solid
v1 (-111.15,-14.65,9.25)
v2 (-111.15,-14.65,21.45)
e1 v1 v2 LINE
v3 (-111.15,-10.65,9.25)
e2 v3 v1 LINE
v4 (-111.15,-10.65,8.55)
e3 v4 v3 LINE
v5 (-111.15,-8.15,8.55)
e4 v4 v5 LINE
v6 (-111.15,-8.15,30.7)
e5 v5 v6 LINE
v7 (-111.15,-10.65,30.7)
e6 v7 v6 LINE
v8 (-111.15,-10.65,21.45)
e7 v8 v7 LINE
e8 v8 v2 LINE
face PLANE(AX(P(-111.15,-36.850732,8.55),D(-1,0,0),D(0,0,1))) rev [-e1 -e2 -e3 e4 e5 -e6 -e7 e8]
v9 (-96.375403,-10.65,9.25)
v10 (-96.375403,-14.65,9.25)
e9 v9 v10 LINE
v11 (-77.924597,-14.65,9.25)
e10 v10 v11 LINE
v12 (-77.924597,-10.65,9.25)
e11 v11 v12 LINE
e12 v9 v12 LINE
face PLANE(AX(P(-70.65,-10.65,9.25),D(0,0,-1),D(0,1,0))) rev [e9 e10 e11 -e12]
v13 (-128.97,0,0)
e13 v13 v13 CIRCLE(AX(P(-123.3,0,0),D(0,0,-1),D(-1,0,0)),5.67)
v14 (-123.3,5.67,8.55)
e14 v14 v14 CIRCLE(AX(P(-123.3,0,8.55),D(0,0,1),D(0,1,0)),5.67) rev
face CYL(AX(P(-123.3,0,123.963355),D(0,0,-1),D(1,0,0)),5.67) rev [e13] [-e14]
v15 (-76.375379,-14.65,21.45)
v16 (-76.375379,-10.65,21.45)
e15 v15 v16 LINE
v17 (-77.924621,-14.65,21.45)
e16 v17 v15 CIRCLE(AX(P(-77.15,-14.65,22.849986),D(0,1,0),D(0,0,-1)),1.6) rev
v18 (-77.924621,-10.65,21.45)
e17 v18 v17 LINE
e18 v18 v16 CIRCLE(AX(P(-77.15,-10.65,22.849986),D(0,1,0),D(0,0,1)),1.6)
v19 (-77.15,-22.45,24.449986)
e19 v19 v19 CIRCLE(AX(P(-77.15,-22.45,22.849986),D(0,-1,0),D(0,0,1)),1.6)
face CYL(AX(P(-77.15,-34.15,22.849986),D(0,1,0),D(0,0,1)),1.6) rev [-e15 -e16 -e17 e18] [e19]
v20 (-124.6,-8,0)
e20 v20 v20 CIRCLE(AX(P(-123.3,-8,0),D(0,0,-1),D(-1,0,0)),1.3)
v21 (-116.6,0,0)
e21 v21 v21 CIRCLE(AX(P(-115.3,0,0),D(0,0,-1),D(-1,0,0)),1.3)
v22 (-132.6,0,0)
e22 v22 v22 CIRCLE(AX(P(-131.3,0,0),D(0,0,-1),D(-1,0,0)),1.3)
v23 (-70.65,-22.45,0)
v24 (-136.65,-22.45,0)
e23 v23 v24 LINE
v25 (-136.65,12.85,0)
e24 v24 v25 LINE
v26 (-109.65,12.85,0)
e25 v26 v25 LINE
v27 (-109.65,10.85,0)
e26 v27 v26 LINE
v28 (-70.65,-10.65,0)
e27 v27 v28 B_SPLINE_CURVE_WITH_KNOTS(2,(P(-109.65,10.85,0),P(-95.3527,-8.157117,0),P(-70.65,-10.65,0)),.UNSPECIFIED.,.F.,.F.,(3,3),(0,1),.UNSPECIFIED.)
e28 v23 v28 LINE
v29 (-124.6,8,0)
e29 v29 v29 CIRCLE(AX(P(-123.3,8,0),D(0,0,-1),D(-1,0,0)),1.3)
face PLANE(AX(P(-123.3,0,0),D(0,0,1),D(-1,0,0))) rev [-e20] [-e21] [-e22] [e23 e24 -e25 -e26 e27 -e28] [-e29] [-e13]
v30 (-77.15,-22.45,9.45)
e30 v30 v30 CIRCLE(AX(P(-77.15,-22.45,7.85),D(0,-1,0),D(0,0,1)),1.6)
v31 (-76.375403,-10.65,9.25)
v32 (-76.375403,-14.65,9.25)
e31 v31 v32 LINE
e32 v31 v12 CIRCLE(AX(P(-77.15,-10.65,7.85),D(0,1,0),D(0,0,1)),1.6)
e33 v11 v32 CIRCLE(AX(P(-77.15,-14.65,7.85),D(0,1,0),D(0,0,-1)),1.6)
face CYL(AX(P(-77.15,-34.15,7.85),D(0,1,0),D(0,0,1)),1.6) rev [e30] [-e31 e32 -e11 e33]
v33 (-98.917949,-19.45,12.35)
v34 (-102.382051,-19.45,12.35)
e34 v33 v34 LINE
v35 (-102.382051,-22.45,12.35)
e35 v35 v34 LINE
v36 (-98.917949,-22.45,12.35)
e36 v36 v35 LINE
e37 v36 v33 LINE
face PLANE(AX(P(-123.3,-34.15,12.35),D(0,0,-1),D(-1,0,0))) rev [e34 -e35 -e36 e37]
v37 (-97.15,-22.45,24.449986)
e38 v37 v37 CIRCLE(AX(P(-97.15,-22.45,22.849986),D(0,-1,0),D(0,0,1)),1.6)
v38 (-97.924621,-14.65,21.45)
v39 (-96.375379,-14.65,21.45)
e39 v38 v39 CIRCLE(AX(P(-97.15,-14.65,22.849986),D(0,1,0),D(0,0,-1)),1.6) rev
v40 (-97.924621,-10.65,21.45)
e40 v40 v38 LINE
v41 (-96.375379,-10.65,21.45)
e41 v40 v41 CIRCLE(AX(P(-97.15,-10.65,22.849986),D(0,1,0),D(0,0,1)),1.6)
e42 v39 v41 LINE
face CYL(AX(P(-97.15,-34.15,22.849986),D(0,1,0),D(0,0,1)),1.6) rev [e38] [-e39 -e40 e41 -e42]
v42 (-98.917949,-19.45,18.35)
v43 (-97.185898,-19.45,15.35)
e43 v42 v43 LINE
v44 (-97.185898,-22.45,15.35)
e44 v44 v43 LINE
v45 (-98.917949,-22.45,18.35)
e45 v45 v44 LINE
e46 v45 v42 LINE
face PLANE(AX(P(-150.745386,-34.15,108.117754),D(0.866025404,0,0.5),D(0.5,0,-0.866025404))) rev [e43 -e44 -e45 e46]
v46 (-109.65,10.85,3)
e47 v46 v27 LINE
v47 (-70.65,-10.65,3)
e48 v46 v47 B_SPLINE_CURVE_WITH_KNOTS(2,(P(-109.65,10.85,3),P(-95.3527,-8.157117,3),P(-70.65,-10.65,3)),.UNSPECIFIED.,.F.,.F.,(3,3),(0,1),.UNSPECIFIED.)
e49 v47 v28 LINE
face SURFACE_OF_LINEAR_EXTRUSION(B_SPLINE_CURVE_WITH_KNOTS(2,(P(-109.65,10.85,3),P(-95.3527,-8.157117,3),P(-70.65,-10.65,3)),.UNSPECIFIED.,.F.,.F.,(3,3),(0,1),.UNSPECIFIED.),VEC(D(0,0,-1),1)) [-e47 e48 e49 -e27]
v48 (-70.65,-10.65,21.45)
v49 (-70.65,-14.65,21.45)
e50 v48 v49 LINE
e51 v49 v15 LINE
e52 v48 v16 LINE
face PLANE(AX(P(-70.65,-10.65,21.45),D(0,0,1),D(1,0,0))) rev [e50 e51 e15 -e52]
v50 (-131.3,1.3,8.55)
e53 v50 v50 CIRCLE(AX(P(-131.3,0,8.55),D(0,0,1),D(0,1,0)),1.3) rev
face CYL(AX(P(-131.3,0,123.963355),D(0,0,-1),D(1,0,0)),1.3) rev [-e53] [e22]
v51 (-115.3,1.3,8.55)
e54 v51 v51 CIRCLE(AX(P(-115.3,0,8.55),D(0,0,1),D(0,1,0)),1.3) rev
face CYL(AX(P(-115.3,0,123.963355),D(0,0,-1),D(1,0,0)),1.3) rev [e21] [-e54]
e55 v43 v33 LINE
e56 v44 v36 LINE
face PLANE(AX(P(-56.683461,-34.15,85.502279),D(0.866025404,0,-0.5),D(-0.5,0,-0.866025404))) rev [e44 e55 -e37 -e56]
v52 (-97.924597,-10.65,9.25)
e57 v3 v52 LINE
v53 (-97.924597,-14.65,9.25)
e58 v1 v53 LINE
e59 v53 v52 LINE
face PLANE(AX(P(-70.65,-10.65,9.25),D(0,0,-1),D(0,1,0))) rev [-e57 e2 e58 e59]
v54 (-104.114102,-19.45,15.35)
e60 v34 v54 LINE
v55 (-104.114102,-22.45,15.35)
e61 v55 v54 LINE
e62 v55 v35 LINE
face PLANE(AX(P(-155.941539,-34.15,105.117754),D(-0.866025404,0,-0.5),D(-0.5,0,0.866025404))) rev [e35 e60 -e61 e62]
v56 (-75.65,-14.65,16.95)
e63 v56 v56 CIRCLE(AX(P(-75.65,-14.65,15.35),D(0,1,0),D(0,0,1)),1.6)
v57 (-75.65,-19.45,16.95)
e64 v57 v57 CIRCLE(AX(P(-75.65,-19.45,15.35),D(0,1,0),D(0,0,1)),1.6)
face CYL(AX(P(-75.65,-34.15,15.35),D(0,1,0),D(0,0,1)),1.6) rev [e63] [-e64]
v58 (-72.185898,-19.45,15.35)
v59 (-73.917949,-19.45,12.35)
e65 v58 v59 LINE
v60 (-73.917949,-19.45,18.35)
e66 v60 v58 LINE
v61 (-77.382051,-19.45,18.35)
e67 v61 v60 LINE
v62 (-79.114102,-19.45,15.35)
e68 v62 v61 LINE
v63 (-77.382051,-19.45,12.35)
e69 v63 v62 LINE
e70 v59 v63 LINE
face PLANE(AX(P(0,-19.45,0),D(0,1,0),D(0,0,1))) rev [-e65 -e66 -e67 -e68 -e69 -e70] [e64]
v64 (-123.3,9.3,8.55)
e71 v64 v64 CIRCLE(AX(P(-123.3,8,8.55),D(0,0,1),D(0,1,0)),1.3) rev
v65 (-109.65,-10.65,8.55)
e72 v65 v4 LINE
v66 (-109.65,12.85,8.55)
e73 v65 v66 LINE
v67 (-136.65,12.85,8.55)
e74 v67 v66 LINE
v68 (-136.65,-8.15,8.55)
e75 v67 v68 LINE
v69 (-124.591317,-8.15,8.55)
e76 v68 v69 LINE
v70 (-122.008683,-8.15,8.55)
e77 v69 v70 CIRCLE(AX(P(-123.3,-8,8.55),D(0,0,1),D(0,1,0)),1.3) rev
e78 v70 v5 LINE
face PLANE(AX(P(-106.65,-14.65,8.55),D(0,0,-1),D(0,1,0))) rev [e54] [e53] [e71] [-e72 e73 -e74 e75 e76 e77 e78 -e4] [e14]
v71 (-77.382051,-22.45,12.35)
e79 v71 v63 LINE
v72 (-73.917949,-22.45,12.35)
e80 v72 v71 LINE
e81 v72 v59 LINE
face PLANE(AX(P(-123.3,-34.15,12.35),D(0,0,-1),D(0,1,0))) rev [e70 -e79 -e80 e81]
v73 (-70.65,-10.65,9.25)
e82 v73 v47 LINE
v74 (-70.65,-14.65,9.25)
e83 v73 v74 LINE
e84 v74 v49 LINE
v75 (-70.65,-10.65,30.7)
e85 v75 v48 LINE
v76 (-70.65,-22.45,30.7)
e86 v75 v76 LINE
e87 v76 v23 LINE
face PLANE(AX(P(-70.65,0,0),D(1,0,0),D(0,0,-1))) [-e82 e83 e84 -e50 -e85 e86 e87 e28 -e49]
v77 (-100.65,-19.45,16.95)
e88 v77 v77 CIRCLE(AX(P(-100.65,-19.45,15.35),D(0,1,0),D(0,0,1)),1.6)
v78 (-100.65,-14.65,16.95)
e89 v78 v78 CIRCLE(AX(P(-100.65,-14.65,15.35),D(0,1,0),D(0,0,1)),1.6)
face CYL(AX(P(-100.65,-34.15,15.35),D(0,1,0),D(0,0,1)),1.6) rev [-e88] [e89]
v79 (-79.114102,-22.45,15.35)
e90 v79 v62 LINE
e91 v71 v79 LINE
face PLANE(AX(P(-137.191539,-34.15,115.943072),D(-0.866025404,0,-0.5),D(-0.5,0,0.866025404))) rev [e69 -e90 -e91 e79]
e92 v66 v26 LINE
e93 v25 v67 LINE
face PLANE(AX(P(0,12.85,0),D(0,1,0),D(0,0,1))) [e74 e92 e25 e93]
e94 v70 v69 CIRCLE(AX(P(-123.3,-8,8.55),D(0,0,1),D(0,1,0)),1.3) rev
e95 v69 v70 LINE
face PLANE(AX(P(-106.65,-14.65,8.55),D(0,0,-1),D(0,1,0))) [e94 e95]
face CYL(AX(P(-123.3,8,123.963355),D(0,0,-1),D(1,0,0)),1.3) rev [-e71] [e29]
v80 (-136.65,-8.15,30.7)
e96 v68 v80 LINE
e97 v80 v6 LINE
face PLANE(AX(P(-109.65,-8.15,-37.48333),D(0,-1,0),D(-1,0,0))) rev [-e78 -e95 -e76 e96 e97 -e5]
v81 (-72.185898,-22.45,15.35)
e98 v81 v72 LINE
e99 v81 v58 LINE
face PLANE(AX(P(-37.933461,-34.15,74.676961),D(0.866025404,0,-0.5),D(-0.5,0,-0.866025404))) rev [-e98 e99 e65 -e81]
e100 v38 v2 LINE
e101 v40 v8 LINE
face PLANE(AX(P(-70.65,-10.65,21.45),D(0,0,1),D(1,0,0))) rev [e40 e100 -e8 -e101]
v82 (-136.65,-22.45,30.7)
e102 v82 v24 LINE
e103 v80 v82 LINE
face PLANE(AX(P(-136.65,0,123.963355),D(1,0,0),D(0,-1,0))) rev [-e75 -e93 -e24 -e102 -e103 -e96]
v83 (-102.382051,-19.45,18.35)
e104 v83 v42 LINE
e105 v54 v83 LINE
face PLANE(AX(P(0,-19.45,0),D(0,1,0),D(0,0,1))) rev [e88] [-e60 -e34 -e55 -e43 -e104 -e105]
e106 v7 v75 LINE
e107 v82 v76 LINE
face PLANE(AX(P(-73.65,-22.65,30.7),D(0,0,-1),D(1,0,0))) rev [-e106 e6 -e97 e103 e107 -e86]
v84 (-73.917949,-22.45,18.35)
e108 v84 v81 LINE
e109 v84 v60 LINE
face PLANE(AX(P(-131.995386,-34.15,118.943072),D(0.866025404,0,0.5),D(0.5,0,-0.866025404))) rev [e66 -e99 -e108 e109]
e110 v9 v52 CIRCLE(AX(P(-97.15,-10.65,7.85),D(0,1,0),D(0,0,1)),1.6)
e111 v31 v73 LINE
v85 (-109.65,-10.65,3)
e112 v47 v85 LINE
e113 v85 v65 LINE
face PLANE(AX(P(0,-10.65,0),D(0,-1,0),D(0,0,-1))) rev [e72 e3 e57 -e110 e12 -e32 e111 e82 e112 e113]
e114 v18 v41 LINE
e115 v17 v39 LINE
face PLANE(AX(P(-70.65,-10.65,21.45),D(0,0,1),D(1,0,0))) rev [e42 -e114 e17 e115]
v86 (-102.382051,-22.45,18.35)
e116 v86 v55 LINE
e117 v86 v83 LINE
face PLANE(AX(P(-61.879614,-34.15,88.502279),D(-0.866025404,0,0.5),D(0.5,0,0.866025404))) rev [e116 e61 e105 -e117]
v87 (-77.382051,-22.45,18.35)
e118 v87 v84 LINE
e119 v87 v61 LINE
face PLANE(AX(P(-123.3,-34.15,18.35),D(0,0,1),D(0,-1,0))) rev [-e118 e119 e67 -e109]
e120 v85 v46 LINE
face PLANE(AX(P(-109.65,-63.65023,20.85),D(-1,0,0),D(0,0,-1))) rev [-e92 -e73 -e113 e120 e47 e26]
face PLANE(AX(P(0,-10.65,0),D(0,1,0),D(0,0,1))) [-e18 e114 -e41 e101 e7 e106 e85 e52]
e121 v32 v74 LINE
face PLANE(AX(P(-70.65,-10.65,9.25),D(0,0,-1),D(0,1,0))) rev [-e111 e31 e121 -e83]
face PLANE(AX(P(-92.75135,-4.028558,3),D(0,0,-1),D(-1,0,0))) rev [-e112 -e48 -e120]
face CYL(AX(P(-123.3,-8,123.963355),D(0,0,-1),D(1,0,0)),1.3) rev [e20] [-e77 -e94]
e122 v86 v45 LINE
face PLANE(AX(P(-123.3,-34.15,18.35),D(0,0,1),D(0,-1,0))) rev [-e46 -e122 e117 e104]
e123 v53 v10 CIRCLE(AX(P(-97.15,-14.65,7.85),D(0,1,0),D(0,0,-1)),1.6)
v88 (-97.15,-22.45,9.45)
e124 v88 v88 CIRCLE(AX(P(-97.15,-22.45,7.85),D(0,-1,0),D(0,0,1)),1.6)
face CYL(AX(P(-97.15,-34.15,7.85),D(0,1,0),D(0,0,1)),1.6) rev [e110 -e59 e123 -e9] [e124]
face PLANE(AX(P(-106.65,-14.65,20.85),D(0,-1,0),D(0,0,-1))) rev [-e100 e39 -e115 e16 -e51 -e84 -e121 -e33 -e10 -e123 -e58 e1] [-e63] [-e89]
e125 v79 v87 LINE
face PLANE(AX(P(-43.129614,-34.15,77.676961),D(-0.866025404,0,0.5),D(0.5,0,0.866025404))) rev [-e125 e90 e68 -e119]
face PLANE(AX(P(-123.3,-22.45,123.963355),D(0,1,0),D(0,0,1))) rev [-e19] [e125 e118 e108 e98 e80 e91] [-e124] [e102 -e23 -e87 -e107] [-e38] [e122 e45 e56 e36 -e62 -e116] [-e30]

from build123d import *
from build123d.topology import SkipClean

# Parameters (mm, degrees)
CROQUIS2_R                         = 10.875
CROQUIS2_R_2                       = 5.67
CROQUIS2_R_3                       = 1.6
CROQUIS2_R_4                       = 1.3
SALIENTE_EXTRUIR1_DEPTH            = 30.7
CROQUIS4_W                         = 27
CROQUIS4_H                         = 26
CORTAR_EXTRUIR2_DEPTH              = 22.7
CROQUIS3_W                         = 12.3
CROQUIS3_H                         = 8
CORTAR_EXTRUIR5_DEPTH              = 45
CORTAR_EXTRUIR7_START              = -24.5
CROQUIS7_W                         = 48
CROQUIS7_H                         = 9.85
CORTAR_EXTRUIR7_DEPTH              = 24.5
CORTAR_EXTRUIR10_DEPTH             = 77.154202117
CORTAR_EXTRUIR10_DEPTH_BACK        = 77.154202117
CROQUIS11_R                        = 1.6
CROQUIS18_W                        = 48
CROQUIS18_H                        = 9.85
CORTAR_EXTRUIR12_DEPTH             = 8
CROQUIS19_W                        = 12.3
CROQUIS19_H                        = 8
CORTAR_EXTRUIR13_DEPTH             = 3
CROQUIS20_R                        = 1.3
CROQUIS20_R_2                      = 5.67
SALIENTE_EXTRUIR2_DEPTH            = 0.55
SALIENTE_EXTRUIR4_START            = -22.15
SALIENTE_EXTRUIR4_DEPTH            = 22.15
S_LIDO_MOVER_COPIAR1_START         = 8.55
S_LIDO_MOVER_COPIAR1_DEPTH         = 22.15
S_LIDO_MOVER_COPIAR1_2_DEPTH       = 22.15
S_LIDO_MOVER_COPIAR1_3_DEPTH       = 30.7
S_LIDO_MOVER_COPIAR1_4_OUTLINE_R   = 1.3
S_LIDO_MOVER_COPIAR1_4_OUTLINE_R_2 = 5.67
S_LIDO_MOVER_COPIAR1_4_DEPTH       = 8.55
S_LIDO_MOVER_COPIAR1_START_2       = -34.15
S_LIDO_MOVER_COPIAR1_5_OUTLINE_R   = 1.6
S_LIDO_MOVER_COPIAR1_5_OUTLINE_W   = 75
S_LIDO_MOVER_COPIAR1_5_OUTLINE_H   = 30.7
S_LIDO_MOVER_COPIAR1_5_DEPTH       = 52
CROQUIS23_R                        = 1.6
CORTAR_EXTRUIR17_DEPTH             = 144.777475635
CORTAR_EXTRUIR18_DEPTH             = 3
CORTAR_EXTRUIR18_DEPTH_BACK        = 144.777475635
CORTAR_EXTRUIR18_START             = -7.8
CROQUIS24_W                        = 75
CROQUIS24_H                        = 30.7
CORTAR_EXTRUIR19_DEPTH             = 11.7
CROQUIS28_W                        = 27
CROQUIS28_H                        = 8.55
CORTAR_EXTRUIR21_DEPTH             = 5
CORTAR_EXTRUIR22_START             = -8
CORTAR_EXTRUIR22_DEPTH             = 8
CROQUIS30_W                        = 1.5
CROQUIS30_H                        = 22.15
CORTAR_EXTRUIR23_DEPTH             = 6.5
CROQUIS31_W                        = 30.7
CROQUIS31_H                        = 7.8
CORTAR_EXTRUIR24_DEPTH             = 9
CROQUIS32_W                        = 40.5
CROQUIS32_H                        = 9.25
CROQUIS32_W_2                      = 39
SALIENTE_EXTRUIR5_DEPTH            = 4
CROQUIS33_W                        = 1.5
CROQUIS33_H                        = 0.7
SALIENTE_EXTRUIR6_DEPTH            = 4
CROQUIS34_R                        = 1.6
CORTAR_EXTRUIR25_DEPTH             = 143.013951779
SALIENTE_EXTRUIR7_DEPTH            = 3


with BuildPart() as part:
    # Croquis2 → Saliente-Extruir1 (new body)
    # profile 1 of 6: a face of its own
    with BuildSketch(Plane.XY):
        Polygon((-61.65, 17.85), (-61.65, -34.15), (-50.65, -34.15), (-50.65, -32.65), (-50.65, -22.65), (-50.65, -22.45), (-49.65, -22.45), (-22.65, -22.45), (-21.65, -22.45), (-21.65, -22.65), (-21.65, -32.65), (-21.65, -34.15), (13.35, -34.15), (13.35, 17.85), align=None)
        Circle(CROQUIS2_R, mode=Mode.SUBTRACT)
    # profile 2 of 6: a face of its own
    with BuildSketch(Plane.XY):
        Circle(CROQUIS2_R)
        with Locations(Location((0, 0, 0), (0, 0, 90))):
            Circle(CROQUIS2_R_2, mode=Mode.SUBTRACT)
        with Locations((0, -8)):
            Circle(CROQUIS2_R_3, mode=Mode.SUBTRACT)
        with Locations((-8, 0)):
            Circle(CROQUIS2_R_3, mode=Mode.SUBTRACT)
        with Locations((8, 0)):
            Circle(CROQUIS2_R_3, mode=Mode.SUBTRACT)
        with Locations((0, 8)):
            Circle(CROQUIS2_R_3, mode=Mode.SUBTRACT)
    # profile 3 of 6: a face of its own
    with BuildSketch(Plane.XY):
        with Locations((0, 8)):
            Circle(CROQUIS2_R_3)
        with Locations(Location((0, 8, 0), (0, 0, 90))):
            Circle(CROQUIS2_R_4, mode=Mode.SUBTRACT)
    # profile 4 of 6: a face of its own
    with BuildSketch(Plane.XY):
        with Locations((8, 0)):
            Circle(CROQUIS2_R_3)
        with Locations(Location((8, 0, 0), (0, 0, 90))):
            Circle(CROQUIS2_R_4, mode=Mode.SUBTRACT)
    # profile 5 of 6: a face of its own
    with BuildSketch(Plane.XY):
        with Locations((0, -8)):
            Circle(CROQUIS2_R_3)
        with Locations(Location((0, -8, 0), (0, 0, 90))):
            Circle(CROQUIS2_R_4, mode=Mode.SUBTRACT)
    # profile 6 of 6: a face of its own
    with BuildSketch(Plane.XY):
        with Locations((-8, 0)):
            Circle(CROQUIS2_R_3)
        with Locations(Location((-8, 0, 0), (0, 0, 90))):
            Circle(CROQUIS2_R_4, mode=Mode.SUBTRACT)
    extrude(amount=SALIENTE_EXTRUIR1_DEPTH)

    # Croquis4 → Cortar-Extruir2 (cut)
    with BuildSketch(Plane.XY.offset(30.7)):
        with Locations((-0.15, 4.85)):
            Rectangle(CROQUIS4_W, CROQUIS4_H)
    extrude(amount=-CORTAR_EXTRUIR2_DEPTH, mode=Mode.SUBTRACT)

    # Croquis3 → Cortar-Extruir5 (cut)
    with BuildSketch(Plane.ZY.offset(61.65)):
        with Locations((14.7, -10.65)):
            Rectangle(CROQUIS3_W, CROQUIS3_H)
    extrude(amount=-CORTAR_EXTRUIR5_DEPTH, mode=Mode.SUBTRACT)

    # Croquis7 → Cortar-Extruir7 (cut)
    with BuildSketch(Plane(origin=(0, 17.85, 0), x_dir=(1, 0, 0), z_dir=(0, 1, 0)).offset(CORTAR_EXTRUIR7_START)):
        with Locations((-37.65, -25.775)):
            Rectangle(CROQUIS7_W, CROQUIS7_H)
        Polygon((-61.65, -8.55), (-61.65, -20.85), (-13.65, -20.85), (-13.65, 0), (-61.65, 0), align=None)
    extrude(amount=CORTAR_EXTRUIR7_DEPTH, mode=Mode.SUBTRACT)

    # Croquis11 → Cortar-Extruir10 (cut, two sides: drawn at the far end of the back side and taken through both)
    with BuildSketch(Plane(origin=(0, -14.65, 0), x_dir=(1, 0, 0), z_dir=(0, 1, 0)).offset(-CORTAR_EXTRUIR10_DEPTH_BACK)):
        with BuildLine():
            Line((-44.711250543, -8.55), (-47.588749457, -8.55))
            ThreePointArc((-47.588749457, -8.55), (-46.15, -9.45), (-44.711250543, -8.55))
        make_face()
        with BuildLine():
            ThreePointArc((-44.55, -7.85), (-46.509166305, -6.290833695), (-47.588749457, -8.55))
            Line((-47.588749457, -8.55), (-44.711250543, -8.55))
            ThreePointArc((-44.711250543, -8.55), (-44.590833695, -8.209166305), (-44.55, -7.85))
        make_face()
        with BuildLine():
            Line((-24.711250543, -8.55), (-27.588749457, -8.55))
            ThreePointArc((-27.588749457, -8.55), (-26.15, -9.45), (-24.711250543, -8.55))
        make_face()
        with BuildLine():
            ThreePointArc((-24.55, -7.85), (-26.509166305, -6.290833695), (-27.588749457, -8.55))
            Line((-27.588749457, -8.55), (-24.711250543, -8.55))
            ThreePointArc((-24.711250543, -8.55), (-24.590833695, -8.209166305), (-24.55, -7.85))
        make_face()
        with Locations(Location((-26.15, -22.849986467, 0), (0, 0, 270))):
            Circle(CROQUIS11_R)
        with Locations(Location((-46.15, -22.849986467, 0), (0, 0, 270))):
            Circle(CROQUIS11_R)
    extrude(amount=CORTAR_EXTRUIR10_DEPTH + CORTAR_EXTRUIR10_DEPTH_BACK, mode=Mode.SUBTRACT)

    # Croquis18 → Cortar-Extruir12 (cut)
    with BuildSketch(Plane(origin=(0, -6.65, 0), x_dir=(1, 0, 0), z_dir=(0, 1, 0))):
        with Locations((-37.65, -25.775)):
            Rectangle(CROQUIS18_W, CROQUIS18_H)
    extrude(amount=-CORTAR_EXTRUIR12_DEPTH, mode=Mode.SUBTRACT)

    # Croquis19 → Cortar-Extruir13 (cut)
    with BuildSketch(Plane.ZY.offset(16.65)):
        with Locations((14.7, -10.65)):
            Rectangle(CROQUIS19_W, CROQUIS19_H)
    extrude(amount=-CORTAR_EXTRUIR13_DEPTH, mode=Mode.SUBTRACT)

    # Croquis20 → Saliente-Extruir2 (add)
    with SkipClean():  # the faces are left unmerged after this step: merging them gives an invalid solid
        with BuildSketch(Plane.XY.offset(8)):
            with BuildLine():
                ThreePointArc((-1.291317157, -8.15), (0, -6.7), (1.291317157, -8.15))
                Line((1.291317157, -8.15), (13.35, -8.15))
                Line((13.35, -8.15), (13.35, 17.85))
                Line((13.35, 17.85), (-13.65, 17.85))
                Line((-13.65, 17.85), (-13.65, -6.65))
                Line((-13.65, -6.65), (-13.65, -8.15))
                Line((-13.65, -8.15), (-1.291317157, -8.15))
            make_face()
            with Locations(Location((8, 0, 0), (0, 0, 90))):
                Circle(CROQUIS20_R, mode=Mode.SUBTRACT)
            with Locations(Location((0, 0, 0), (0, 0, 90))):
                Circle(CROQUIS20_R_2, mode=Mode.SUBTRACT)
            with Locations(Location((0, 8, 0), (0, 0, 90))):
                Circle(CROQUIS20_R, mode=Mode.SUBTRACT)
            with Locations(Location((-8, 0, 0), (0, 0, 90))):
                Circle(CROQUIS20_R, mode=Mode.SUBTRACT)
        extrude(amount=SALIENTE_EXTRUIR2_DEPTH)

    # Croquis22 → Saliente-Extruir4 (add)
    with BuildSketch(Plane.XY.offset(30.7).offset(SALIENTE_EXTRUIR4_START)):
        with BuildLine():
            Line((-1.291317157, -8.15), (1.291317157, -8.15))
            ThreePointArc((1.291317157, -8.15), (0, -9.3), (-1.291317157, -8.15))
        make_face()
    extrude(amount=SALIENTE_EXTRUIR4_DEPTH)

    # Sólido-Mover/Copiar1: read off the stored shape, not the designer's step
    # Sólido-Mover/Copiar1 outline → Sólido-Mover/Copiar1 (cut)
    with BuildSketch(Plane.XY.offset(S_LIDO_MOVER_COPIAR1_START)):
        with BuildLine():
            Line((1.291317157, -8.15), (-1.291317157, -8.15))
            ThreePointArc((-1.291317157, -8.15), (0, -9.3), (1.291317157, -8.15))
        make_face()
    extrude(amount=S_LIDO_MOVER_COPIAR1_DEPTH, mode=Mode.SUBTRACT)



with BuildPart() as body_2:
    # S_lido-Mover_Copiar1 2 outline → S_lido-Mover_Copiar1 2 (new body)
    with BuildSketch(Plane.XY.offset(S_LIDO_MOVER_COPIAR1_START)):
        with BuildLine():
            Line((-122.008682843, -8.15), (-124.591317157, -8.15))
            ThreePointArc((-124.591317157, -8.15), (-123.3, -9.3), (-122.008682843, -8.15))
        make_face()
    extrude(amount=S_LIDO_MOVER_COPIAR1_2_DEPTH)


with BuildPart() as part_1:
    add(part.part)

    add(body_2.part)  # S_lido-Mover_Copiar1 3 merges body 2
    # S_lido-Mover_Copiar1 3 outline → S_lido-Mover_Copiar1 3 (add)
    with BuildSketch(Plane.XY):
        with BuildLine():
            Line((-124.591317157, -8.15), (-136.65, -8.15))
            Line((-136.65, -8.15), (-136.65, -34.15))
            Line((-136.65, -34.15), (-101.65, -34.15))
            Line((-101.65, -34.15), (-101.65, -22.45))
            Line((-101.65, -22.45), (-72.65, -22.45))
            Line((-72.65, -22.45), (-72.65, -34.15))
            Line((-72.65, -34.15), (-50.65, -34.15))
            Line((-50.65, -34.15), (-50.65, -22.45))
            Line((-50.65, -22.45), (-21.65, -22.45))
            Line((-21.65, -22.45), (-21.65, -34.15))
            Line((-21.65, -34.15), (13.35, -34.15))
            Line((13.35, -34.15), (13.35, -8.15))
            Line((13.35, -8.15), (1.291317157, -8.15))
            ThreePointArc((1.291317157, -8.15), (0, -9.3), (-1.291317157, -8.15))
            Line((-1.291317157, -8.15), (-13.65, -8.15))
            Line((-13.65, -8.15), (-13.65, -14.65))
            Line((-13.65, -14.65), (-109.65, -14.65))
            Line((-109.65, -14.65), (-109.65, -8.15))
            Line((-109.65, -8.15), (-122.008682843, -8.15))
            ThreePointArc((-122.008682843, -8.15), (-123.3, -9.3), (-124.591317157, -8.15))
        make_face()
    extrude(amount=S_LIDO_MOVER_COPIAR1_3_DEPTH)

    # S_lido-Mover_Copiar1 4 outline → S_lido-Mover_Copiar1 4 (add)
    with BuildSketch(Plane.XY):
        with BuildLine():
            Line((-136.65, 17.85), (-136.65, -8.15))
            Line((-136.65, -8.15), (-124.591317157, -8.15))
            ThreePointArc((-124.591317157, -8.15), (-123.3, -6.7), (-122.008682843, -8.15))
            Line((-122.008682843, -8.15), (-109.65, -8.15))
            Line((-109.65, -8.15), (-109.65, -14.65))
            Line((-109.65, -14.65), (-13.65, -14.65))
            Line((-13.65, -14.65), (-13.65, -8.15))
            Line((-13.65, -8.15), (-1.291317157, -8.15))
            ThreePointArc((-1.291317157, -8.15), (0, -6.7), (1.291317157, -8.15))
            Line((1.291317157, -8.15), (13.35, -8.15))
            Line((13.35, -8.15), (13.35, 17.85))
            Line((13.35, 17.85), (-13.65, 17.85))
            Line((-13.65, 17.85), (-13.65, -6.65))
            Line((-13.65, -6.65), (-109.65, -6.65))
            Line((-109.65, -6.65), (-109.65, 17.85))
            Line((-109.65, 17.85), (-136.65, 17.85))
        make_face()
        with Locations((-131.3, 0)):
            Circle(S_LIDO_MOVER_COPIAR1_4_OUTLINE_R, mode=Mode.SUBTRACT)
        with Locations((-123.3, 0)):
            Circle(S_LIDO_MOVER_COPIAR1_4_OUTLINE_R_2, mode=Mode.SUBTRACT)
        with Locations((-115.3, 0)):
            Circle(S_LIDO_MOVER_COPIAR1_4_OUTLINE_R, mode=Mode.SUBTRACT)
        with Locations((-123.3, 8)):
            Circle(S_LIDO_MOVER_COPIAR1_4_OUTLINE_R, mode=Mode.SUBTRACT)
        with Locations((-8, 0)):
            Circle(S_LIDO_MOVER_COPIAR1_4_OUTLINE_R, mode=Mode.SUBTRACT)
        Circle(S_LIDO_MOVER_COPIAR1_4_OUTLINE_R_2, mode=Mode.SUBTRACT)
        with Locations((8, 0)):
            Circle(S_LIDO_MOVER_COPIAR1_4_OUTLINE_R, mode=Mode.SUBTRACT)
        with Locations((0, 8)):
            Circle(S_LIDO_MOVER_COPIAR1_4_OUTLINE_R, mode=Mode.SUBTRACT)
    extrude(amount=S_LIDO_MOVER_COPIAR1_4_DEPTH)

    # S_lido-Mover_Copiar1 5 outline → S_lido-Mover_Copiar1 5 (cut)
    with BuildSketch(Plane(origin=(0, 0, 0), x_dir=(1, 0, 0), z_dir=(0, 1, 0)).offset(S_LIDO_MOVER_COPIAR1_START_2)):
        with Locations((-97.15, -7.85)):
            Circle(S_LIDO_MOVER_COPIAR1_5_OUTLINE_R)
        with Locations((-77.15, -7.85)):
            Circle(S_LIDO_MOVER_COPIAR1_5_OUTLINE_R)
        with Locations((-24.15, -15.35)):
            Rectangle(S_LIDO_MOVER_COPIAR1_5_OUTLINE_W, S_LIDO_MOVER_COPIAR1_5_OUTLINE_H)
        with Locations((-97.15, -22.849986467)):
            Circle(S_LIDO_MOVER_COPIAR1_5_OUTLINE_R)
        with Locations((-77.15, -22.849986467)):
            Circle(S_LIDO_MOVER_COPIAR1_5_OUTLINE_R)
    extrude(amount=S_LIDO_MOVER_COPIAR1_5_DEPTH, mode=Mode.SUBTRACT)

    # Croquis23 → Cortar-Extruir17 (cut, through all)
    with BuildSketch(Plane(origin=(0, -14.65, 0), x_dir=(1, 0, 0), z_dir=(0, 1, 0))):
        with Locations(Location((-100.65, -15.35, 0), (0, 0, 270))):
            Circle(CROQUIS23_R)
        with Locations(Location((-75.65, -15.35, 0), (0, 0, 270))):
            Circle(CROQUIS23_R)
    extrude(amount=-CORTAR_EXTRUIR17_DEPTH, mode=Mode.SUBTRACT)

    # Croquis23<3> → Cortar-Extruir18 (cut, two sides: drawn at the far end of the back side and taken through both)
    with BuildSketch(Plane(origin=(0, -14.65, 0), x_dir=(1, 0, 0), z_dir=(0, 1, 0)).offset(CORTAR_EXTRUIR18_START - CORTAR_EXTRUIR18_DEPTH_BACK)):
        Polygon((-73.917949192, -12.35), (-77.382050808, -12.35), (-79.114101615, -15.35), (-77.382050808, -18.35), (-73.917949192, -18.35), (-72.185898385, -15.35), align=None)
        Polygon((-98.917949192, -12.35), (-102.382050808, -12.35), (-104.114101615, -15.35), (-102.382050808, -18.35), (-98.917949192, -18.35), (-97.185898385, -15.35), align=None)
    extrude(amount=CORTAR_EXTRUIR18_DEPTH + CORTAR_EXTRUIR18_DEPTH_BACK, mode=Mode.SUBTRACT)

    # Croquis24 → Cortar-Extruir19 (cut)
    with BuildSketch(Plane.XZ.offset(34.15)):
        with Locations((-99.15, 15.35)):
            Rectangle(CROQUIS24_W, CROQUIS24_H)
    extrude(amount=-CORTAR_EXTRUIR19_DEPTH, mode=Mode.SUBTRACT)

    # Croquis28 → Cortar-Extruir21 (cut)
    with BuildSketch(Plane(origin=(0, 17.85, 0), x_dir=(1, 0, 0), z_dir=(0, 1, 0))):
        with Locations((-123.15, -4.275)):
            Rectangle(CROQUIS28_W, CROQUIS28_H)
    extrude(amount=-CORTAR_EXTRUIR21_DEPTH, mode=Mode.SUBTRACT)

    # Croquis29 → Cortar-Extruir22 (cut)
    with BuildSketch(Plane(origin=(0, -6.65, 0), x_dir=(1, 0, 0), z_dir=(0, 1, 0)).offset(CORTAR_EXTRUIR22_START)):
        with BuildLine():
            Line((-109.65, -8.55), (-98.588749457, -8.55))
            ThreePointArc((-98.588749457, -8.55), (-97.15, -6.25), (-95.711250543, -8.55))
            Line((-95.711250543, -8.55), (-78.588749457, -8.55))
            ThreePointArc((-78.588749457, -8.55), (-77.15, -6.25), (-75.711250543, -8.55))
            Line((-75.711250543, -8.55), (-61.65, -8.55))
            Line((-61.65, -8.55), (-61.65, 0))
            Line((-61.65, 0), (-109.65, 0))
            Line((-109.65, 0), (-109.65, -8.55))
        make_face()
    extrude(amount=CORTAR_EXTRUIR22_DEPTH, mode=Mode.SUBTRACT)

    # Croquis30 → Cortar-Extruir23 (cut)
    with BuildSketch(Plane(origin=(0, -8.15, 0), x_dir=(1, 0, 0), z_dir=(0, 1, 0))):
        with Locations((-110.4, -19.625)):
            Rectangle(CROQUIS30_W, CROQUIS30_H)
    extrude(amount=-CORTAR_EXTRUIR23_DEPTH, mode=Mode.SUBTRACT)

    # Croquis31 → Cortar-Extruir24 (cut)
    with BuildSketch(Plane(origin=(-61.65, 0, 0), x_dir=(0, 0, -1), z_dir=(1, 0, 0))):
        with Locations((-15.35, -18.55)):
            Rectangle(CROQUIS31_W, CROQUIS31_H)
    extrude(amount=-CORTAR_EXTRUIR24_DEPTH, mode=Mode.SUBTRACT)

    # Croquis32 → Saliente-Extruir5 (add)
    with BuildSketch(Plane(origin=(0, -14.65, 0), x_dir=(1, 0, 0), z_dir=(0, 1, 0))):
        with Locations((-90.9, -26.075)):
            Rectangle(CROQUIS32_W, CROQUIS32_H)
        with Locations((-90.15, -4.625)):
            Rectangle(CROQUIS32_W_2, CROQUIS32_H)
    extrude(amount=SALIENTE_EXTRUIR5_DEPTH)

    # Croquis33 → Saliente-Extruir6 (add)
    with BuildSketch(Plane(origin=(0, -14.65, 0), x_dir=(1, 0, 0), z_dir=(0, 1, 0))):
        with Locations((-110.4, -8.9)):
            Rectangle(CROQUIS33_W, CROQUIS33_H)
    extrude(amount=SALIENTE_EXTRUIR6_DEPTH)

    # Croquis34 → Cortar-Extruir25 (cut, through all)
    with BuildSketch(Plane(origin=(0, -10.65, 0), x_dir=(1, 0, 0), z_dir=(0, 1, 0))):
        with Locations(Location((-97.15, -22.849986467, 0), (0, 0, 270))):
            Circle(CROQUIS34_R)
        with Locations(Location((-77.15, -22.849986467, 0), (0, 0, 270))):
            Circle(CROQUIS34_R)
        with Locations(Location((-77.15, -7.85, 0), (0, 0, 270))):
            Circle(CROQUIS34_R)
        with Locations(Location((-97.15, -7.85, 0), (0, 0, 270))):
            Circle(CROQUIS34_R)
    extrude(amount=-CORTAR_EXTRUIR25_DEPTH, mode=Mode.SUBTRACT)

    # Croquis36 → Saliente-Extruir7 (add)
    with BuildSketch(Plane(origin=(0, 0, 0), x_dir=(-1, 0, 0), z_dir=(0, 0, -1))):
        with BuildLine():
            Line((70.65, -10.65), (109.65, -10.65))
            Line((109.65, -10.65), (109.65, 10.85))
            add(Edge.make_bspline(
                [(109.65, 10.85), (95.352699805, -8.157116541), (70.65, -10.65)],
                knots=[0, 0, 0, 1, 1, 1], degree=2))
        make_face()
    extrude(amount=-SALIENTE_EXTRUIR7_DEPTH)


solid = part_1.part
